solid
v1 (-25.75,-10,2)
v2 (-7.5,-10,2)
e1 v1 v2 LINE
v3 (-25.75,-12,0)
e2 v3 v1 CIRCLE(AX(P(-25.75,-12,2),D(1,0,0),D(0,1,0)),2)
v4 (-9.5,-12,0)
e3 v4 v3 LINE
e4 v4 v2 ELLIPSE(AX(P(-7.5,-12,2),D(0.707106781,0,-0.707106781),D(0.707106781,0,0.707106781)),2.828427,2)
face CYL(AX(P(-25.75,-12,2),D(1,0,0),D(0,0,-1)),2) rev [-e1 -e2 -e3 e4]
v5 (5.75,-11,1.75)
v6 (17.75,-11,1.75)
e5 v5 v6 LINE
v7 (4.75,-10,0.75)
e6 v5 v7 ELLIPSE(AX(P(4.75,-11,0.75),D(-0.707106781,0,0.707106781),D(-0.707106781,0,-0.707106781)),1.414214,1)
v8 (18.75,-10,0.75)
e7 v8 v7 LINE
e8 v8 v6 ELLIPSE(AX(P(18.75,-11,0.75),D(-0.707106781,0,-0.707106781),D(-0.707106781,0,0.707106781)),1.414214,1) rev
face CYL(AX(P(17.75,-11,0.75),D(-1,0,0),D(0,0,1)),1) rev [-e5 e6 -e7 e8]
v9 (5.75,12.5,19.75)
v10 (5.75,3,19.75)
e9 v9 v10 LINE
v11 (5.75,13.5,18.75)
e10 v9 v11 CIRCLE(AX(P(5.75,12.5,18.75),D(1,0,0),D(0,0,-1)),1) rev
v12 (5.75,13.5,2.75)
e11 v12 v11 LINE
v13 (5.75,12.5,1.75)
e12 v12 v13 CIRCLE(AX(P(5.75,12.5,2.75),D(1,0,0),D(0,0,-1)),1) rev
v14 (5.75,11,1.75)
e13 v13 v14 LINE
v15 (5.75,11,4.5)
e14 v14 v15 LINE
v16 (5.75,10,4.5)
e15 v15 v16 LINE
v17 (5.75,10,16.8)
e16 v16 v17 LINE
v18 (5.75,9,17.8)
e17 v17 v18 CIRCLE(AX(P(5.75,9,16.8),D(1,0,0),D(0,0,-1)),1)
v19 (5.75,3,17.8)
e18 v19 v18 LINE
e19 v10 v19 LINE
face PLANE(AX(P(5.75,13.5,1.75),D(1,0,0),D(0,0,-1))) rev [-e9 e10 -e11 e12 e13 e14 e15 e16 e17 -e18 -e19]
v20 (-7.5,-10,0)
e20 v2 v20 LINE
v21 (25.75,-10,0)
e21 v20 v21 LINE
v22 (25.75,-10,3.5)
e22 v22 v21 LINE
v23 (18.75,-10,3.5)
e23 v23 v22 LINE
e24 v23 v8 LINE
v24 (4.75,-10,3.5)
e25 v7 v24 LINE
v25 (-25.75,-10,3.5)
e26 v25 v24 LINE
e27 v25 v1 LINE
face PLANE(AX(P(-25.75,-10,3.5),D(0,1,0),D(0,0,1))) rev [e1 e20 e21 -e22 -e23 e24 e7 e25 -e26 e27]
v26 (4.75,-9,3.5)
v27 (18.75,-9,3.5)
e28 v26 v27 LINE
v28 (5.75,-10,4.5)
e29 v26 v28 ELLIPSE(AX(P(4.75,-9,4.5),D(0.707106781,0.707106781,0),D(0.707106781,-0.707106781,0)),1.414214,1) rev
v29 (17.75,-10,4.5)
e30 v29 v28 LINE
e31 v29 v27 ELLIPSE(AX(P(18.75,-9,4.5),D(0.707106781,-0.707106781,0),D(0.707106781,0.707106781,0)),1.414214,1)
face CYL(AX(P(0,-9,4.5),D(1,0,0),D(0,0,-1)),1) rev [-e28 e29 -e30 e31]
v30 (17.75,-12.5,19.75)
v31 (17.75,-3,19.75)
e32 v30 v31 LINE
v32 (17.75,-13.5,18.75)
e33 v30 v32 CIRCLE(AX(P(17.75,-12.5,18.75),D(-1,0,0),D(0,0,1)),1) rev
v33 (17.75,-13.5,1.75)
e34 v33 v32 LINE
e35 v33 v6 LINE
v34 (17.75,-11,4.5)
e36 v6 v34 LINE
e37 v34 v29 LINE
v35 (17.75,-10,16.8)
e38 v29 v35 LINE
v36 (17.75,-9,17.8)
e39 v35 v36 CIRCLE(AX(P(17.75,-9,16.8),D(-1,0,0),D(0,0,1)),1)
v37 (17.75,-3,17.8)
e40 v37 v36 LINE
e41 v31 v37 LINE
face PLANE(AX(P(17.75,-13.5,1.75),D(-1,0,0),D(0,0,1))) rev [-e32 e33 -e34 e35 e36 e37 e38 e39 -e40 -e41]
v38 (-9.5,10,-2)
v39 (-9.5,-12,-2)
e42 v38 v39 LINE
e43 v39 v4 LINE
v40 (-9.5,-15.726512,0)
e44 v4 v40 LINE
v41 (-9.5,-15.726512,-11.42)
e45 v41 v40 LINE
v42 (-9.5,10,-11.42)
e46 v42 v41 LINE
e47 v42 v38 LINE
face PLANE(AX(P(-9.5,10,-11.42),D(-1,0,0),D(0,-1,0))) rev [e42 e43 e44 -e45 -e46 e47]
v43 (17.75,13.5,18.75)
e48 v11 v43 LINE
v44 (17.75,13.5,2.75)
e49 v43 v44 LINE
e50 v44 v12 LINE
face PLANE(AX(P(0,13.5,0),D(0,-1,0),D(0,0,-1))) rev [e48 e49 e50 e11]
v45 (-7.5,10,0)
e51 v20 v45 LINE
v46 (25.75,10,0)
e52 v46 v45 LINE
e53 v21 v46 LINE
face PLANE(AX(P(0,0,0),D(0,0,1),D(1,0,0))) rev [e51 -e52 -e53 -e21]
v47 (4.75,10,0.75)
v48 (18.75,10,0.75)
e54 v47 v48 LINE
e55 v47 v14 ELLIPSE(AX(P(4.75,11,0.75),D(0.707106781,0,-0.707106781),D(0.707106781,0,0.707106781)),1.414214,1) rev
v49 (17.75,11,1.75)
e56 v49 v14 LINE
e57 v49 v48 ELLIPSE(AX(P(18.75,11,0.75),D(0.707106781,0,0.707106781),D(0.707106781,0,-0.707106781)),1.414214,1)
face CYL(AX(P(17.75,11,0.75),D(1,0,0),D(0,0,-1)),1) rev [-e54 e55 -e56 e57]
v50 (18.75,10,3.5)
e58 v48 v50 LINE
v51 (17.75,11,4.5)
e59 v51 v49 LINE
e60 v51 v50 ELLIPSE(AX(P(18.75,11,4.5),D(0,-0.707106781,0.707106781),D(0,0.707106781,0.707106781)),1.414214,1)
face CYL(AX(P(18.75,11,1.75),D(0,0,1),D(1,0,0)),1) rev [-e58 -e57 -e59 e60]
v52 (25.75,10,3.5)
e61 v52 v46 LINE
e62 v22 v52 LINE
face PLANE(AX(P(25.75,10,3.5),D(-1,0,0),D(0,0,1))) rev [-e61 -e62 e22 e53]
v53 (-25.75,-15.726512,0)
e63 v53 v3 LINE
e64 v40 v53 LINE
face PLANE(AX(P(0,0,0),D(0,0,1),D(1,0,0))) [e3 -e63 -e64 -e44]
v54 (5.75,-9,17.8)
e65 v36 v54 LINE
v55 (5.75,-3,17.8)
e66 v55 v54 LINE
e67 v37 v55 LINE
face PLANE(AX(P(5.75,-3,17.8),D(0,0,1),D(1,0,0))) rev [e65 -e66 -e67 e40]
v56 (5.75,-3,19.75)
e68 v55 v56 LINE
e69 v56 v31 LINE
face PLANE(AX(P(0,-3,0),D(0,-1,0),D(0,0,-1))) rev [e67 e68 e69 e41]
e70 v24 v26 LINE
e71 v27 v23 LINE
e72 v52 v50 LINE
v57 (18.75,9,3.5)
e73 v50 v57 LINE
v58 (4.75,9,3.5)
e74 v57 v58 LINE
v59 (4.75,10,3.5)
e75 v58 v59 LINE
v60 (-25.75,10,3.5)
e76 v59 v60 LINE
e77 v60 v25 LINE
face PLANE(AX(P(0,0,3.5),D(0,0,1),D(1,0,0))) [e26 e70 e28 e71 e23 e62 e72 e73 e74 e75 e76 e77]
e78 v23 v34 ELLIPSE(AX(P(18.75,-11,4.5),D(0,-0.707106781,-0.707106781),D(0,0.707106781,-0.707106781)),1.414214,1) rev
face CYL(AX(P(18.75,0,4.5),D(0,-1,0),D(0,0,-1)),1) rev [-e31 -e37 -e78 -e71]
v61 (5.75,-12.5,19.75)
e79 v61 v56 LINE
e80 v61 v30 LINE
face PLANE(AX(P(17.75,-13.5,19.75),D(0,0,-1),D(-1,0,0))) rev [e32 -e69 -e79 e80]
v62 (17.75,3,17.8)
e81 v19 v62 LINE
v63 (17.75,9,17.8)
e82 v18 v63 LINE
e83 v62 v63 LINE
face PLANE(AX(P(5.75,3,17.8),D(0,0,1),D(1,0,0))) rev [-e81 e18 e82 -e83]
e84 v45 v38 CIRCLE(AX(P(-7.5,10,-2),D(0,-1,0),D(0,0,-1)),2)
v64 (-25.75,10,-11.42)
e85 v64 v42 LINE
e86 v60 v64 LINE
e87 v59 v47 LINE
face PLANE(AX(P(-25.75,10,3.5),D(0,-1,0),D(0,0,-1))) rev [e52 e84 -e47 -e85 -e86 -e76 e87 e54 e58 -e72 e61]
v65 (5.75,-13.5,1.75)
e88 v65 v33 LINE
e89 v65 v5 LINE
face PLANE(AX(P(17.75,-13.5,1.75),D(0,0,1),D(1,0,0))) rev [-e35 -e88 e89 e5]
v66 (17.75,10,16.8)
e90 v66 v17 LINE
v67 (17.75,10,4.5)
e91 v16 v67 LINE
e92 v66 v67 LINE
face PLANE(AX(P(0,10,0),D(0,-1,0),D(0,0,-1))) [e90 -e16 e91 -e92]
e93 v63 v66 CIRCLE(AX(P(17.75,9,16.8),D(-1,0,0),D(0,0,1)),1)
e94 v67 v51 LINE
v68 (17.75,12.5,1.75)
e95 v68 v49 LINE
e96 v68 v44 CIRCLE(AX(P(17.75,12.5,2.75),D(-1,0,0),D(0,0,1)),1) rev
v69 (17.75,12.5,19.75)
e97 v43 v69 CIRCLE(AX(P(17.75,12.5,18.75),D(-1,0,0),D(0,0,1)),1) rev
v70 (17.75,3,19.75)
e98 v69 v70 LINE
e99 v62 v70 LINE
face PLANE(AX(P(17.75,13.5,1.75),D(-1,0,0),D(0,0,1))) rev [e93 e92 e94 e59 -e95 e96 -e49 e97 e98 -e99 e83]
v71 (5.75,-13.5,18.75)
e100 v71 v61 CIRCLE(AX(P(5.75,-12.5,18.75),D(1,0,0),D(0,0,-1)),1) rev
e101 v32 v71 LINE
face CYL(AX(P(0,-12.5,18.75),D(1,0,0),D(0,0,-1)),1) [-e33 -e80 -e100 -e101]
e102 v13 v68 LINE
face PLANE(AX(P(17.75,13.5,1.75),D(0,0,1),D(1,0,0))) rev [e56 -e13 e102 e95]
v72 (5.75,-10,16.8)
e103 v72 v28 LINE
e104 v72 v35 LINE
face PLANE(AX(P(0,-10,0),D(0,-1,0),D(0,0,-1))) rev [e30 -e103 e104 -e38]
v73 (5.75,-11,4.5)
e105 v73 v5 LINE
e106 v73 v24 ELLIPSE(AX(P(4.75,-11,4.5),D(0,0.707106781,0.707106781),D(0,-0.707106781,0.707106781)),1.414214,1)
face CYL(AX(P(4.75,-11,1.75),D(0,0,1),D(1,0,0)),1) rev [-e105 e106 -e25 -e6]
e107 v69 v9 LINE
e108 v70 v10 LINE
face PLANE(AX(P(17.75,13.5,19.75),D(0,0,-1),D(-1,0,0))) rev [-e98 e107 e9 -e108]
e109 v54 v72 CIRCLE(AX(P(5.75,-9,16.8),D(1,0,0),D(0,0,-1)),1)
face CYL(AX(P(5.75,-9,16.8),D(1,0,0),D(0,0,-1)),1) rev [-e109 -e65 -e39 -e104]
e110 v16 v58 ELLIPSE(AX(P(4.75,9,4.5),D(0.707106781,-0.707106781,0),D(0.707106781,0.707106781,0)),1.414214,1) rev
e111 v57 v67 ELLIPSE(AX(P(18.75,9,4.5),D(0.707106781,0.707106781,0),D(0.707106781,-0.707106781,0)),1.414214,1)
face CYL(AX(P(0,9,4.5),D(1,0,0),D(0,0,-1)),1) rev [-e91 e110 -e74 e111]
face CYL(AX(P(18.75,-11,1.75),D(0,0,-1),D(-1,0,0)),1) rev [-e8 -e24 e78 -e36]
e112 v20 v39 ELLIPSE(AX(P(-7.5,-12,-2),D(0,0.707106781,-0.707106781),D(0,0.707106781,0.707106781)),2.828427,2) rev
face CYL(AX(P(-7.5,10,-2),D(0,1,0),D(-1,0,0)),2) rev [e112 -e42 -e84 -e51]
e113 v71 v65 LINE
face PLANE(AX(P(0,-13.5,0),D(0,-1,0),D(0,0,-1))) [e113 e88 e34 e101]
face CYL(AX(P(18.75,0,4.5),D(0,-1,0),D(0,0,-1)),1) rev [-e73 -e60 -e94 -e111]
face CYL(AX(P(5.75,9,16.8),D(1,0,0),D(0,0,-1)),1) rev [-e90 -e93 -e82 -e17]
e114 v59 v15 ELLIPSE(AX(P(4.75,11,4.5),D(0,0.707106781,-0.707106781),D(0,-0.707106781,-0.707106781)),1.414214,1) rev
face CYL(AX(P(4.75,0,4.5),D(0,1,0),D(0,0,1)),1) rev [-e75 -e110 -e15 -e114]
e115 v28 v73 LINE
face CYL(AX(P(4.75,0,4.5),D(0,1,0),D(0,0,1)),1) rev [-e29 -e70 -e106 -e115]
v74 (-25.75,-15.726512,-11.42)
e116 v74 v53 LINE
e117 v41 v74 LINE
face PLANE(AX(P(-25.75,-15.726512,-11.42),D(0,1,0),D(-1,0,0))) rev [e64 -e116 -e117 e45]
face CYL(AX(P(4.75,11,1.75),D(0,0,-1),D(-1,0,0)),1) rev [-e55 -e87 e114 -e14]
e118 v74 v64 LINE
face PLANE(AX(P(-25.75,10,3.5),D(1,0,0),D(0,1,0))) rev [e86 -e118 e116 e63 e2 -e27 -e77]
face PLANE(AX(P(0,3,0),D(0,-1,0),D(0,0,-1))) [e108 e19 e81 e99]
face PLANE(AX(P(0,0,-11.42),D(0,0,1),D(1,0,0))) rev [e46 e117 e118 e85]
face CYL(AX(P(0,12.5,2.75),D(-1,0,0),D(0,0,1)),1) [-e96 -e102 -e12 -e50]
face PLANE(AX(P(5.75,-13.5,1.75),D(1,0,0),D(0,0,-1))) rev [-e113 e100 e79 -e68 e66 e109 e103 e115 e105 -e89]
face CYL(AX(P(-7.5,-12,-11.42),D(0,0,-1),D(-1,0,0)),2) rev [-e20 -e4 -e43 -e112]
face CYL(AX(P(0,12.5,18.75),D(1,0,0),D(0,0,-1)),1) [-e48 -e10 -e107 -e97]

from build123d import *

# Parameters (mm, degrees)
SKETCH1_W           = 51.5
SKETCH1_H           = 20
BOSS_EXTRUDE1_DEPTH = 3.5
SKETCH2_W           = 12
SKETCH2_H           = 18
BOSS_EXTRUDE2_DEPTH = 3.5
FILLET1_R           = 1
FILLET2_R           = 1
SKETCH3_W           = 12
SKETCH3_H           = 18
BOSS_EXTRUDE3_DEPTH = 3.5
FILLET3_R           = 1
FILLET4_R           = 1
FILLET5_R           = 1
FILLET6_R           = 1
FILLET7_R           = 1
FILLET8_R           = 1
FILLET9_R           = 1
FILLET10_R          = 1
FILLET11_R          = 1
FILLET12_R          = 1
SKETCH4_W           = 12
SKETCH4_H           = 1.95
BOSS_EXTRUDE4_DEPTH = 7
SKETCH5_W           = 12
SKETCH5_H           = 1.95
BOSS_EXTRUDE5_DEPTH = 7
FILLET13_R          = 1
FILLET14_R          = 1
FILLET15_R          = 1
FILLET16_R          = 1
FILLET17_R          = 1
SKETCH8_W           = 16.25
SKETCH8_H           = 25.726511914
BOSS_EXTRUDE6_DEPTH = 11.42
FILLET21_R          = 2
FILLET22_R          = 2
FILLET23_R          = 2


with BuildPart() as part:
    # Sketch1 → Boss-Extrude1 (new body)
    with BuildSketch(Plane.XY):
        Rectangle(SKETCH1_W, SKETCH1_H)
    extrude(amount=BOSS_EXTRUDE1_DEPTH)

    # Sketch2 → Boss-Extrude2 (add)
    with BuildSketch(Plane(origin=(0, 10, 0), x_dir=(1, 0, 0), z_dir=(0, 1, 0))):
        with Locations((11.75, -10.75)):
            Rectangle(SKETCH2_W, SKETCH2_H)
    extrude(amount=BOSS_EXTRUDE2_DEPTH)

    # Fillet1
    fillet1_edges = [part.edges().sort_by_distance(p)[0] for p in [
        (11.75, 10, 1.75),
    ]]
    fillet(fillet1_edges, radius=FILLET1_R)

    # Fillet2
    fillet2_edges = [part.edges().sort_by_distance(p)[0] for p in [
        (11.75, 10, 3.5),
    ]]
    fillet(fillet2_edges, radius=FILLET2_R)

    # Sketch3 → Boss-Extrude3 (add)
    with BuildSketch(Plane(origin=(0, -10, 0), x_dir=(-1, 0, 0), z_dir=(0, -1, 0))):
        with Locations((-11.75, -10.75)):
            Rectangle(SKETCH3_W, SKETCH3_H)
    extrude(amount=BOSS_EXTRUDE3_DEPTH)

    # Fillet3
    fillet3_edges = [part.edges().sort_by_distance(p)[0] for p in [
        (11.75, -10, 1.75),
    ]]
    fillet(fillet3_edges, radius=FILLET3_R)

    # Fillet4
    fillet4_edges = [part.edges().sort_by_distance(p)[0] for p in [
        (11.75, -10, 3.5),
    ]]
    fillet(fillet4_edges, radius=FILLET4_R)

    # Fillet5
    fillet5_edges = [part.edges().sort_by_distance(p)[0] for p in [
        (17.75, 10, 2.125),
    ]]
    fillet(fillet5_edges, radius=FILLET5_R)

    # Fillet6
    fillet6_edges = [part.edges().sort_by_distance(p)[0] for p in [
        (5.75, 10, 2.125),
    ]]
    fillet(fillet6_edges, radius=FILLET6_R)

    # Fillet7
    fillet7_edges = [part.edges().sort_by_distance(p)[0] for p in [
        (17.75, 10, 3.5),
    ]]
    fillet(fillet7_edges, radius=FILLET7_R)

    # Fillet8
    fillet8_edges = [part.edges().sort_by_distance(p)[0] for p in [
        (5.75, 10, 3.5),
    ]]
    fillet(fillet8_edges, radius=FILLET8_R)

    # Fillet9
    fillet9_edges = [part.edges().sort_by_distance(p)[0] for p in [
        (5.75, -10, 2.125),
    ]]
    fillet(fillet9_edges, radius=FILLET9_R)

    # Fillet10
    fillet10_edges = [part.edges().sort_by_distance(p)[0] for p in [
        (5.75, -10, 3.5),
    ]]
    fillet(fillet10_edges, radius=FILLET10_R)

    # Fillet11
    fillet11_edges = [part.edges().sort_by_distance(p)[0] for p in [
        (17.75, -10, 2.125),
    ]]
    fillet(fillet11_edges, radius=FILLET11_R)

    # Fillet12
    fillet12_edges = [part.edges().sort_by_distance(p)[0] for p in [
        (17.75, -10, 3.5),
    ]]
    fillet(fillet12_edges, radius=FILLET12_R)

    # Sketch4 → Boss-Extrude4 (add)
    with BuildSketch(Plane(origin=(0, -10, 0), x_dir=(1, 0, 0), z_dir=(0, 1, 0))):
        with Locations((11.75, -18.775)):
            Rectangle(SKETCH4_W, SKETCH4_H)
    extrude(amount=BOSS_EXTRUDE4_DEPTH)

    # Sketch5 → Boss-Extrude5 (add)
    with BuildSketch(Plane(origin=(0, 10, 0), x_dir=(-1, 0, 0), z_dir=(0, -1, 0))):
        with Locations((-11.75, -18.775)):
            Rectangle(SKETCH5_W, SKETCH5_H)
    extrude(amount=BOSS_EXTRUDE5_DEPTH)

    # Fillet13
    fillet13_edges = [part.edges().sort_by_distance(p)[0] for p in [
        (11.75, 10, 17.8),
    ]]
    fillet(fillet13_edges, radius=FILLET13_R)

    # Fillet14
    fillet14_edges = [part.edges().sort_by_distance(p)[0] for p in [
        (11.75, 13.5, 19.75),
    ]]
    fillet(fillet14_edges, radius=FILLET14_R)

    # Fillet15
    fillet15_edges = [part.edges().sort_by_distance(p)[0] for p in [
        (11.75, 13.5, 1.75),
    ]]
    fillet(fillet15_edges, radius=FILLET15_R)

    # Fillet16
    fillet16_edges = [part.edges().sort_by_distance(p)[0] for p in [
        (11.75, -13.5, 19.75),
    ]]
    fillet(fillet16_edges, radius=FILLET16_R)

    # Fillet17
    fillet17_edges = [part.edges().sort_by_distance(p)[0] for p in [
        (11.75, -10, 17.8),
    ]]
    fillet(fillet17_edges, radius=FILLET17_R)

    # Sketch8 → Boss-Extrude6 (add)
    with BuildSketch(Plane(origin=(0, 0, 0), x_dir=(-1, 0, 0), z_dir=(0, 0, -1))):
        with Locations((17.625, -2.863255957)):
            Rectangle(SKETCH8_W, SKETCH8_H)
    extrude(amount=BOSS_EXTRUDE6_DEPTH)

    # Fillet21
    fillet21_edges = [part.edges().sort_by_distance(p)[0] for p in [
        (-9.5, 0, 0),
    ]]
    fillet(fillet21_edges, radius=FILLET21_R)

    # Fillet22
    fillet22_edges = [part.edges().sort_by_distance(p)[0] for p in [
        (-17.625, -10, 0),
    ]]
    fillet(fillet22_edges, radius=FILLET22_R)

    # Fillet23
    fillet23_edges = [part.edges().sort_by_distance(p)[0] for p in [
        (-9.5, -10, 0),
    ]]
    fillet(fillet23_edges, radius=FILLET23_R - 0.0001)  # a hair under: the kernel refuses the full size


solid = part.part
